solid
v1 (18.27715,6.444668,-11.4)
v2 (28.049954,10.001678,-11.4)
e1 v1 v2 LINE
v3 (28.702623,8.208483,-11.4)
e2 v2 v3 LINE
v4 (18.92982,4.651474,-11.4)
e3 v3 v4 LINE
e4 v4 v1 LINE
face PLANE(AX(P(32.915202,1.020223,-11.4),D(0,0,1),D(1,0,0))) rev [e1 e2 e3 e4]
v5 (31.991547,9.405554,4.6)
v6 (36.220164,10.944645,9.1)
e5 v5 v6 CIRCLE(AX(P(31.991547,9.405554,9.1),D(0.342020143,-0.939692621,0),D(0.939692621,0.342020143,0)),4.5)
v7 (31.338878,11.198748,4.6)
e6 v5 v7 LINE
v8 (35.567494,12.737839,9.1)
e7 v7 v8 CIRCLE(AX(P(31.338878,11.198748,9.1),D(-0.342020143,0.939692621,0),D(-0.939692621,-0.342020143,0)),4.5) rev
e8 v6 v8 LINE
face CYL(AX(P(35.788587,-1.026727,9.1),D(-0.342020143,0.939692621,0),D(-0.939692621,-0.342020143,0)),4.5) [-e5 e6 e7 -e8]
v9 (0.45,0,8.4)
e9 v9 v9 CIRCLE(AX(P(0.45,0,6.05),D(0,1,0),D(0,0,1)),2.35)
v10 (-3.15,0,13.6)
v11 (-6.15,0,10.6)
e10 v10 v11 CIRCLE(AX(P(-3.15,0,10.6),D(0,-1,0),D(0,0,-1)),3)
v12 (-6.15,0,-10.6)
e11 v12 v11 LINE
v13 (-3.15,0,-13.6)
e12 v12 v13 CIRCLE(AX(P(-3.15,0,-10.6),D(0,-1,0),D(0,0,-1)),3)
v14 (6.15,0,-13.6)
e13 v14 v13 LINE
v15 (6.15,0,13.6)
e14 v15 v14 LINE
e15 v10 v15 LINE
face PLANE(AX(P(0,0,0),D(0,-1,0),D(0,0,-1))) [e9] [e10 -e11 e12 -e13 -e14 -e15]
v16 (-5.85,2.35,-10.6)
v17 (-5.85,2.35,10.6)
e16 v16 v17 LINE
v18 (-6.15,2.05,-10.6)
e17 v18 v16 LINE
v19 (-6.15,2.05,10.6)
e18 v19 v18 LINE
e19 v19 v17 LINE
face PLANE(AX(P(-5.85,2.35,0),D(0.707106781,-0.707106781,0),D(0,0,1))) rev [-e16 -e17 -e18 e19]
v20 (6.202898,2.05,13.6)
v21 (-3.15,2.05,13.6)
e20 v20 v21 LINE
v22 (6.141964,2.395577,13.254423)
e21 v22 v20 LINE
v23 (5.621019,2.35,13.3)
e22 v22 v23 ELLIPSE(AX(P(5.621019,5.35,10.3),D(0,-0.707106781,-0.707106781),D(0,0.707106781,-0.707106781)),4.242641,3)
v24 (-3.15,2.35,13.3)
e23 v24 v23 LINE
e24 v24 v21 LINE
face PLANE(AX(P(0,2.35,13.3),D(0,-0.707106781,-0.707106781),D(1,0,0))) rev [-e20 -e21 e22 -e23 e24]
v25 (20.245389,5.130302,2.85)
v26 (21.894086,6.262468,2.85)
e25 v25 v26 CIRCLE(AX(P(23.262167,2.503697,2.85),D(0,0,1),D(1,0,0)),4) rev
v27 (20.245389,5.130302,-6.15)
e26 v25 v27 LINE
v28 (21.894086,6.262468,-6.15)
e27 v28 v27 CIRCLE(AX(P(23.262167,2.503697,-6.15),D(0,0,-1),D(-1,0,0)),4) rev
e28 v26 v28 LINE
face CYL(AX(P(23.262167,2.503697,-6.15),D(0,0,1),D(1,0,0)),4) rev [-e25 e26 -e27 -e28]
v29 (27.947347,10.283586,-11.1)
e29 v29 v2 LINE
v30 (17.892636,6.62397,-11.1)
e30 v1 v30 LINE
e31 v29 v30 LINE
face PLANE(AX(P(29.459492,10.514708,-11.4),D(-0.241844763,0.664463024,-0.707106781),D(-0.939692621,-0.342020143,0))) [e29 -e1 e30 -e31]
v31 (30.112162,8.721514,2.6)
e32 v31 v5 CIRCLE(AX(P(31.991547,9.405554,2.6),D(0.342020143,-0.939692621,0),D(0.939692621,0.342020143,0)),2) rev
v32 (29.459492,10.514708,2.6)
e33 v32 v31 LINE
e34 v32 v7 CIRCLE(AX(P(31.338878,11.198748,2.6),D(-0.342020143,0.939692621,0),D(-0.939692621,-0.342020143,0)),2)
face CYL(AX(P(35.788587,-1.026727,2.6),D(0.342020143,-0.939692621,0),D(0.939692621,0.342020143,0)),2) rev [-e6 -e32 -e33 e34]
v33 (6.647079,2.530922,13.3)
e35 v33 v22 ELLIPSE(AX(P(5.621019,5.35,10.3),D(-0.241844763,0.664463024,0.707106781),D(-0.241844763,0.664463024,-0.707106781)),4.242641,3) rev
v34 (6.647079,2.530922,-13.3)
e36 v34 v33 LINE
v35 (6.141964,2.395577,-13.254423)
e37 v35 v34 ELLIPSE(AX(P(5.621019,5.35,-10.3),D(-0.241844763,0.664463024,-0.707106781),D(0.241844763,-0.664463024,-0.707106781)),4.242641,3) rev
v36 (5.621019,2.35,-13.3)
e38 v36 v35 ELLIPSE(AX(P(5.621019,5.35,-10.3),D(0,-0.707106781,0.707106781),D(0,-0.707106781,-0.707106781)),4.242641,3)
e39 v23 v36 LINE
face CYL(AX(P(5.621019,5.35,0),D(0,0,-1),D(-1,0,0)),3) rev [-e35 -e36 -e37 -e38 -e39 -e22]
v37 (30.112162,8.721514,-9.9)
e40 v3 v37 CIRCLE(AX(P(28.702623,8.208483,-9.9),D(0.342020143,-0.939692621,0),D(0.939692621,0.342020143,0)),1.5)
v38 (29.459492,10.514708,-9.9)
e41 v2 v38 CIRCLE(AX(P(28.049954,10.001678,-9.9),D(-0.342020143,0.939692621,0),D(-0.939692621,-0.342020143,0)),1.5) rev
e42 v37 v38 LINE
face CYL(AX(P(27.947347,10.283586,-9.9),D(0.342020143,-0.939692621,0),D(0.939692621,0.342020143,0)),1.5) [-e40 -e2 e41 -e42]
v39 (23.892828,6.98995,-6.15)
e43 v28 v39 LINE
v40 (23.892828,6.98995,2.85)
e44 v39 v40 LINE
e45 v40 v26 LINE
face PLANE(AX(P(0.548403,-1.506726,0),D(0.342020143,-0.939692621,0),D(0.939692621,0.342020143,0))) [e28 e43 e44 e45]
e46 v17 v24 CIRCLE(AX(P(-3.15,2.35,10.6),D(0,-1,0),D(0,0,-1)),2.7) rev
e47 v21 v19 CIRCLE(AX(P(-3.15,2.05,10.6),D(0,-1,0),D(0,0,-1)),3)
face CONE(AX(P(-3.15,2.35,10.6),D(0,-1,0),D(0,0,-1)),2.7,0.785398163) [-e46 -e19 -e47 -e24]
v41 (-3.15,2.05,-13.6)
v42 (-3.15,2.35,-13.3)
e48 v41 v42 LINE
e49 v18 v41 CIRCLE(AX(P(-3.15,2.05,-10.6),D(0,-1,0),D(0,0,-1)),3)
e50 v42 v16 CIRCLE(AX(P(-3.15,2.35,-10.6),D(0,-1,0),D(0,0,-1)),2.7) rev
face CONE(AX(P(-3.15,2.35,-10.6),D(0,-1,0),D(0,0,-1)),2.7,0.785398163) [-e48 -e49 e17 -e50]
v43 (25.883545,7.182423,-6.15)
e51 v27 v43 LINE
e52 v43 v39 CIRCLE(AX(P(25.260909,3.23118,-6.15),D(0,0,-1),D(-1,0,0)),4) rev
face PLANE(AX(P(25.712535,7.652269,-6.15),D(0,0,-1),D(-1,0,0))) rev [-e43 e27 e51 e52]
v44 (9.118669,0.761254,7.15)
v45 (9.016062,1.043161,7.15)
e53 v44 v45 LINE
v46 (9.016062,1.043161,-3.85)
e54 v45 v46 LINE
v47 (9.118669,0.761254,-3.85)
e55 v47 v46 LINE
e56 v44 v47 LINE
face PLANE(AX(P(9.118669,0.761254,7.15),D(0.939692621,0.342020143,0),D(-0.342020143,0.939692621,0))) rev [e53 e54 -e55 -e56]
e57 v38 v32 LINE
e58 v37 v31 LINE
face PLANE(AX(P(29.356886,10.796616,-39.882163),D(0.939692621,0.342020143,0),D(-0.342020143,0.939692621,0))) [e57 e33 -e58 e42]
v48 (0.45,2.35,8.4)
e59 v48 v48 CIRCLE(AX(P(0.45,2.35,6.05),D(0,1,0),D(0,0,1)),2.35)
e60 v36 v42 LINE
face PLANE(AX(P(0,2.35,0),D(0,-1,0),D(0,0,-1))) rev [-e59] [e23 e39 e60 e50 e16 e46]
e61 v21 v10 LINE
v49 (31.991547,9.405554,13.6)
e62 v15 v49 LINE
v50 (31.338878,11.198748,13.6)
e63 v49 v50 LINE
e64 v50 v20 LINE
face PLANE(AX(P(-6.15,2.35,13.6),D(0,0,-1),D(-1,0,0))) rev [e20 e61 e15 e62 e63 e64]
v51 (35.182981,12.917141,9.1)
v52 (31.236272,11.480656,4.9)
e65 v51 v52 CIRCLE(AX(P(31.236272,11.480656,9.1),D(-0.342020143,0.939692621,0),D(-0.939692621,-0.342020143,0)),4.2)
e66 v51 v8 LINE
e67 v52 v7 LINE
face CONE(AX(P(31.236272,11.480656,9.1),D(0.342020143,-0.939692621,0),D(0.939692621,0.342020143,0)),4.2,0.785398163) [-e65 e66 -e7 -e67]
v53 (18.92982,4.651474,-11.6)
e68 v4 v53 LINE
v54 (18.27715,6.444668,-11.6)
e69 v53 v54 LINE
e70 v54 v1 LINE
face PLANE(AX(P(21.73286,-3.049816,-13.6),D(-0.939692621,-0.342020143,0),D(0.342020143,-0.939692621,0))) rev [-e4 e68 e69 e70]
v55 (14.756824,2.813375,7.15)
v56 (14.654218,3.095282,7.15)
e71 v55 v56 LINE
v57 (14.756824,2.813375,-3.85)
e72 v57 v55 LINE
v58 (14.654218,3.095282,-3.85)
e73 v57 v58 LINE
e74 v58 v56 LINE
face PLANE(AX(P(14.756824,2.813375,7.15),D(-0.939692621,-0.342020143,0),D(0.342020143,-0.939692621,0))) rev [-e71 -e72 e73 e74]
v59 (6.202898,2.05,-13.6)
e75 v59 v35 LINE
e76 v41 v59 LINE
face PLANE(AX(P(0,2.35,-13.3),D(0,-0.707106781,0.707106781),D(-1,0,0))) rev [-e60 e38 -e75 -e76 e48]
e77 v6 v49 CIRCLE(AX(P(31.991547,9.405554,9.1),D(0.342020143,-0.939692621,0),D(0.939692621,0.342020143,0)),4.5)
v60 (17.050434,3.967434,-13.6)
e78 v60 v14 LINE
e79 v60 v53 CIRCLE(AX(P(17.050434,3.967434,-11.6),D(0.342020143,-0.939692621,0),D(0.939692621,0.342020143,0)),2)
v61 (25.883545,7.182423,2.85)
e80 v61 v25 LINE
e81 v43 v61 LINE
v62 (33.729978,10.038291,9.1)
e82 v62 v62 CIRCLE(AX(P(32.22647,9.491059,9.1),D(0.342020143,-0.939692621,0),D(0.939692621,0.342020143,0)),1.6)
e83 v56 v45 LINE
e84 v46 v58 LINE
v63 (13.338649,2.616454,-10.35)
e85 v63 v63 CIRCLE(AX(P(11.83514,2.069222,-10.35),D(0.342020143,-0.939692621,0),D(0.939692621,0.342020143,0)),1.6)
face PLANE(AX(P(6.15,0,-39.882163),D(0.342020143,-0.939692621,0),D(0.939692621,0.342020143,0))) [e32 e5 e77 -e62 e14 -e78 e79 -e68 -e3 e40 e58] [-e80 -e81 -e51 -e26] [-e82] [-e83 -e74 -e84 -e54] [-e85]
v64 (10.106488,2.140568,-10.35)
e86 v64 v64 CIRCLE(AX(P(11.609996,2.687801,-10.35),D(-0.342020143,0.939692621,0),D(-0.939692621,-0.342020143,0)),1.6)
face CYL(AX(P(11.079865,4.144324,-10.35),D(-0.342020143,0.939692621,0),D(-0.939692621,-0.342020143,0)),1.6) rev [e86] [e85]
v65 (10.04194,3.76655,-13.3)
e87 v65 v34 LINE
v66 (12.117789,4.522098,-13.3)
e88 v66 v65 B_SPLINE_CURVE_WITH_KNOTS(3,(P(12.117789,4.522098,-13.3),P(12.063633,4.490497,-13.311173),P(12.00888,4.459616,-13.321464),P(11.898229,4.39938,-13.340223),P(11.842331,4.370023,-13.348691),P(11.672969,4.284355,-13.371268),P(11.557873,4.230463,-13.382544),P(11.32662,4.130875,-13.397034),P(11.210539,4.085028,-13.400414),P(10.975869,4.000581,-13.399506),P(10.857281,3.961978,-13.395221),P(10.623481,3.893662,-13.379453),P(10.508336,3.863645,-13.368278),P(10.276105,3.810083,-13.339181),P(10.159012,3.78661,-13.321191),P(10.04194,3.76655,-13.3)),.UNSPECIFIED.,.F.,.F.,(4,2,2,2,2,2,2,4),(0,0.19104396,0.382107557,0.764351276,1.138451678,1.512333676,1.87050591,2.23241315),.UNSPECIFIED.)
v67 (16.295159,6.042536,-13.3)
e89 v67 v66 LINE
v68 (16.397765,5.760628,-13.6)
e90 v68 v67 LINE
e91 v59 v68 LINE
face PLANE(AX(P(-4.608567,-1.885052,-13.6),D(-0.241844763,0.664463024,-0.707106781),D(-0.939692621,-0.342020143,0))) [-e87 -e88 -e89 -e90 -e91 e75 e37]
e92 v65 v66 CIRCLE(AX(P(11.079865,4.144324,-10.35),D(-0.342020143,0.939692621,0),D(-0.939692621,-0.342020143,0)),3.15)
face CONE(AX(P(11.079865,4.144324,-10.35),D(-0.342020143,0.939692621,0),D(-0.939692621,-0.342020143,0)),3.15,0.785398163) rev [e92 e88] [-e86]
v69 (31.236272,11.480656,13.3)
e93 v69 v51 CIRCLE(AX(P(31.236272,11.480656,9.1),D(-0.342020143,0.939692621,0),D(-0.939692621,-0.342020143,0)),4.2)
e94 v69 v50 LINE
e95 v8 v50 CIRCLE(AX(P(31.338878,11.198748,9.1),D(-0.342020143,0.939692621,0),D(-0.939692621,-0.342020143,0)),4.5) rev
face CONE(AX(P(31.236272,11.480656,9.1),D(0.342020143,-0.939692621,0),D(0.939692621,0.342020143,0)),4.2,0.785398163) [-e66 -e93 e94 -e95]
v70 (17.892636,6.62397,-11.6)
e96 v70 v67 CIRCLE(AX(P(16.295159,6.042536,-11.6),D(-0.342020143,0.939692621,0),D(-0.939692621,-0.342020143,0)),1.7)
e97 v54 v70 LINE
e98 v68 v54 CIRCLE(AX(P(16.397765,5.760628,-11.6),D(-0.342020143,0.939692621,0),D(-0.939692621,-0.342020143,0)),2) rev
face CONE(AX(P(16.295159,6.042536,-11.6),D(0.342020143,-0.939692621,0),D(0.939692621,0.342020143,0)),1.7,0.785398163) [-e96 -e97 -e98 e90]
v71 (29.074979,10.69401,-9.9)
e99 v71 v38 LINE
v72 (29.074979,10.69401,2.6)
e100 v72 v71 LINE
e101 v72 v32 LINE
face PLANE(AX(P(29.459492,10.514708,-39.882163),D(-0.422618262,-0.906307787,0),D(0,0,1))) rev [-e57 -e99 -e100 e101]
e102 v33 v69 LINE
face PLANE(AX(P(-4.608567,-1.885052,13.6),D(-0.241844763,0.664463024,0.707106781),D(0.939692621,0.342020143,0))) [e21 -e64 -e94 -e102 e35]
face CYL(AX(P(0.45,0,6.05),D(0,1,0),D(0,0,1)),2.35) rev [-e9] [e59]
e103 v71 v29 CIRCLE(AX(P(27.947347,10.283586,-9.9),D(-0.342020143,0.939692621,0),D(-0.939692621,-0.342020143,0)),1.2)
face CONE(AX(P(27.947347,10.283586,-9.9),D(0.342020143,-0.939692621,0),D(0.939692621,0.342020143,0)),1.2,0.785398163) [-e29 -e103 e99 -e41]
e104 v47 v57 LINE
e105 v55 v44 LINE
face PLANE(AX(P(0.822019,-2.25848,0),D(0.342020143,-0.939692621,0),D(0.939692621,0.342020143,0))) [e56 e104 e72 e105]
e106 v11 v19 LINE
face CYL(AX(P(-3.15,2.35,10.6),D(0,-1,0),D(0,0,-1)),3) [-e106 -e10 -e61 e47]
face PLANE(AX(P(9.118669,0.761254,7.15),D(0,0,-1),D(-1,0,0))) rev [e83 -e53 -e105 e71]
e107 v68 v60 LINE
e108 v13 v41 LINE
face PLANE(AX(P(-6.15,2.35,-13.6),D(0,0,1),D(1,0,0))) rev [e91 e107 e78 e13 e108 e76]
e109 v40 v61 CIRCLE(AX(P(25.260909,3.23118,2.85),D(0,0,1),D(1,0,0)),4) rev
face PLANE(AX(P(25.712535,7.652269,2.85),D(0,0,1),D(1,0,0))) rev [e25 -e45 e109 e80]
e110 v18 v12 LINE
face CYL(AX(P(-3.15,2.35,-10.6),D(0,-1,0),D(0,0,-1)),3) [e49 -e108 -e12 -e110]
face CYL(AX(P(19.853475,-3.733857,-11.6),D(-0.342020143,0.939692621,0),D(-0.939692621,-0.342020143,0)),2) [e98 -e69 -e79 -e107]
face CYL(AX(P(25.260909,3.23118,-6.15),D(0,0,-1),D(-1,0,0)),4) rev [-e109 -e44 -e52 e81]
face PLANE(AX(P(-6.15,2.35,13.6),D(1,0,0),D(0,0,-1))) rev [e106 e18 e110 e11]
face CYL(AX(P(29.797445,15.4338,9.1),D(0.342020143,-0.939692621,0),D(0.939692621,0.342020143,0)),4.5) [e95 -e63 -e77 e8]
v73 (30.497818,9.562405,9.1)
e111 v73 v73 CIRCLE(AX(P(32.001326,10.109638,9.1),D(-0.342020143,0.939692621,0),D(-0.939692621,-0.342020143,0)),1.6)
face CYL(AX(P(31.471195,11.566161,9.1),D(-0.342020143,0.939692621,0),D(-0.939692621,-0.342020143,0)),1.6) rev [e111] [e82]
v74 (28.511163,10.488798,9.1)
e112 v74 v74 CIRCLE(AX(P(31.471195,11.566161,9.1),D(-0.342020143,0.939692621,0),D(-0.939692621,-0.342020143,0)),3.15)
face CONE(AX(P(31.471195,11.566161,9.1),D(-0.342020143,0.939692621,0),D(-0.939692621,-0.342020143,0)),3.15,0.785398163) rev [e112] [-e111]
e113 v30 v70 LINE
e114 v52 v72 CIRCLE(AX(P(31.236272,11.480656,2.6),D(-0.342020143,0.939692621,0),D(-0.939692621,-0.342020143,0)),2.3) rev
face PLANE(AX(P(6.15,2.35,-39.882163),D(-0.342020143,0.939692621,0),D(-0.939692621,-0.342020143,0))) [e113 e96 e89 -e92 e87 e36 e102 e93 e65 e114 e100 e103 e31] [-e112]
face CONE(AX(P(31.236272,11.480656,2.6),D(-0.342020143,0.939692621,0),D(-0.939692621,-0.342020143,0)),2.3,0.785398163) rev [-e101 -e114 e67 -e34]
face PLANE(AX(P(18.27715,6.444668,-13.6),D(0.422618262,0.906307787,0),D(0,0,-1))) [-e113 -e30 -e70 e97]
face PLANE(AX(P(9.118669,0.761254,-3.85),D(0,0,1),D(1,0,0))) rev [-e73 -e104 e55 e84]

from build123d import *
from OCP.BRepFilletAPI import BRepFilletAPI_MakeFillet

# Parameters (mm, degrees)
SKETCH1_W                                       = 12.3
SKETCH1_H                                       = 27.2
BOSS_EXTRUDE1_DEPTH                             = 2.35
BOSS_EXTRUDE2_DEPTH                             = 27.2
SKETCH3_W                                       = 11.9
SKETCH3_H                                       = 2.2
CUT_EXTRUDE1_DEPTH                              = 35.76078799
FILLET1_R1                                      = 2
FILLET1_R2                                      = 1.5
FILLET1_R3                                      = 3
SKETCH4_R                                       = 2.35
CUT_EXTRUDE2_DEPTH                              = 35.103483837
SKETCH6_W                                       = 6.5
SKETCH6_H                                       = 9
BOSS_EXTRUDE4_DEPTH                             = 2.208277659
FILLET3_R                                       = 2
FILLET4_R                                       = 4.5
CSK_FOR_M3_FLAT_HEAD_MACHINE_SCREW1_D           = 3.2
CSK_FOR_M3_FLAT_HEAD_MACHINE_SCREW1_CSINK_D     = 6.3
CSK_FOR_M3_FLAT_HEAD_MACHINE_SCREW1_CSINK_ANGLE = 90
FILLET6_R                                       = 3
CHAMFER2_SIZE                                   = 0.3
FILLET7_R                                       = 3
SKETCH14_W                                      = 6
SKETCH14_H                                      = 11
BOSS_EXTRUDE5_DEPTH                             = 0.3
SKETCH15_W                                      = 6
SKETCH15_H                                      = 9
CUT_EXTRUDE3_DEPTH                              = 0.5
FILLET8_R                                       = 4


# Some blends are built 0.0001 mm under size
with BuildPart() as part:
    # Sketch1 → Boss-Extrude1 (new body)
    with BuildSketch(Plane(origin=(0, 0, 0), x_dir=(1, 0, 0), z_dir=(0, 1, 0))):
        Rectangle(SKETCH1_W, SKETCH1_H)
    extrude(amount=BOSS_EXTRUDE1_DEPTH)

    # Sketch2 → Boss-Extrude2 (add)
    with BuildSketch(Plane.XY.offset(13.6)):
        Polygon((6.15, 2.35), (29.356886389, 10.796615875), (30.11216183, 8.721513655), (6.15, 0), align=None)
    extrude(amount=-BOSS_EXTRUDE2_DEPTH)

    # Sketch3 → Cut-Extrude1 (cut, through all)
    with BuildSketch(Plane(origin=(-0.035862104, 0.098530321, 0), x_dir=(0.9396926207859082, 0.34202014332566943, 0), z_dir=(-0.34202014332566943, 0.9396926207859082, 0))):
        with Locations((25.329109618, 12.5)):
            Rectangle(SKETCH3_W, SKETCH3_H)
    extrude(amount=-CUT_EXTRUDE1_DEPTH, mode=Mode.SUBTRACT)

    # Fillet1: one fillet with a radius per group of edges: ONE call of the kernel's fillet builder (fillet() takes one radius for all edges)
    fillet1_edges_1 = [part.edges().sort_by_distance(p)[0] for p in [
        (18.552181922, 5.68902506, -13.6),
    ]]
    fillet1_edges_2 = [part.edges().sort_by_distance(p)[0] for p in [
        (29.734524109, 9.759064765, -11.4),
    ]]
    fillet1_edges_3 = [part.edges().sort_by_distance(p)[0] for p in [
        (-6.15, 1.175, -13.6),
    ]]
    fillet1 = BRepFilletAPI_MakeFillet(part.part.solid().wrapped)
    for e in fillet1_edges_1:
        fillet1.Add(FILLET1_R1, e.wrapped)
    for e in fillet1_edges_2:
        fillet1.Add(FILLET1_R2, e.wrapped)
    for e in fillet1_edges_3:
        fillet1.Add(FILLET1_R3, e.wrapped)
    add(Compound.cast(fillet1.Shape()), mode=Mode.REPLACE)

    # Sketch4 → Cut-Extrude2 (cut, through all)
    with BuildSketch(Plane(origin=(0, 2.35, 0), x_dir=(1, 0, 0), z_dir=(0, 1, 0))):
        with Locations(Location((0.45, -6.05, 0), (0, 0, 270))):
            Circle(SKETCH4_R)
    extrude(amount=-CUT_EXTRUDE2_DEPTH, mode=Mode.SUBTRACT)

    # Sketch6 → Boss-Extrude4 (add)
    with BuildSketch(Plane(origin=(-0.035862104, 0.098530321, 0), x_dir=(0.9396926207859082, 0.34202014332566943, 0), z_dir=(-0.34202014332566943, 0.9396926207859082, 0))):
        with Locations((34.529109618, -9.1)):
            Rectangle(SKETCH6_W, SKETCH6_H)
    extrude(amount=-BOSS_EXTRUDE4_DEPTH)

    # Fillet3
    fillet3_edges = [part.edges().sort_by_distance(p)[0] for p in [
        (29.734524109, 9.759064765, 4.6),
    ]]
    fillet(fillet3_edges, radius=FILLET3_R)

    # Fillet4
    fillet4_edges = [part.edges().sort_by_distance(p)[0] for p in [
        (35.842526144, 11.982195697, 13.6),
        (35.842526144, 11.982195697, 4.6),
    ]]
    fillet(fillet4_edges, radius=FILLET4_R - 0.0001)  # a hair under: the kernel refuses the full size

    # CSK for M3 Flat Head Machine Screw1 (through all)
    with Locations(Plane(origin=(-0.035862104, 0.098530321, 0), x_dir=(0.9396926207859082, 0.34202014332566943, 0), z_dir=(-0.34202014332566943, 0.9396926207859082, 0))):
        with Locations((33.529109618, -9.1), (11.829109618, 10.35)):
            CounterSinkHole(CSK_FOR_M3_FLAT_HEAD_MACHINE_SCREW1_D / 2, CSK_FOR_M3_FLAT_HEAD_MACHINE_SCREW1_CSINK_D / 2, counter_sink_angle=CSK_FOR_M3_FLAT_HEAD_MACHINE_SCREW1_CSINK_ANGLE)

    # Fillet6
    fillet6_edges = [part.edges().sort_by_distance(p)[0] for p in [
        (-6.15, 1.175, 13.6),
    ]]
    fillet(fillet6_edges, radius=FILLET6_R)

    # Chamfer2
    # the kernel refuses this chamfer: 0.3 mm, written as the material it takes off along each edge
    with BuildSketch(Plane(origin=(-3.15, 2.35, 13.6), x_dir=(0, -1, 0), z_dir=(1, 0, 0))) as chamfer2_piece_1_section:
        Polygon((CHAMFER2_SIZE, 0), (0, CHAMFER2_SIZE), (0, 0), align=None)
    chamfer2_piece_1 = extrude(amount=10.071504896, mode=Mode.PRIVATE)
    chamfer2_piece_1 = split(chamfer2_piece_1, bisect_by=Plane(origin=(-2.554750309, 0.714564914, 11.859606334), z_dir=(-0.2418447626479751, 0.6644630243886727, 0.7071067811865496)), keep=Keep.TOP, mode=Mode.PRIVATE)
    add(chamfer2_piece_1, mode=Mode.SUBTRACT)
    with BuildSketch(Plane(origin=(-3.15, 2.35, 10.6), x_dir=(-1, 0, 0), z_dir=(0, 0, -1))) as chamfer2_piece_2:
        Polygon((3, -CHAMFER2_SIZE), (3 - CHAMFER2_SIZE, 0), (3, 0), align=None)
    revolve(axis=Axis((-3.15, 2.35, 10.6), (0, 1, 0)), revolution_arc=90, mode=Mode.SUBTRACT)
    with BuildSketch(Plane(origin=(5.425022542, 2.086129785, -13.6), x_dir=(0.34202014332566943, -0.9396926207859082, 0), z_dir=(0.9396926207859081, 0.34202014332566943, 0))) as chamfer2_piece_3_section:
        Polygon((CHAMFER2_SIZE, 0), (0, -CHAMFER2_SIZE), (0, 0), align=None)
    chamfer2_piece_3 = extrude(amount=11.56775756, mode=Mode.PRIVATE)
    chamfer2_piece_3 = split(chamfer2_piece_3, bisect_by=Plane(origin=(5.425022542, 2.068064892, -13.581935108), z_dir=(0, 0.7071067811865486, -0.7071067811865465)), keep=Keep.TOP, mode=Mode.PRIVATE)
    add(chamfer2_piece_3, mode=Mode.SUBTRACT)
    with BuildSketch(Plane(origin=(17.449566743, 6.462705955, -11.4), x_dir=(0, 0, 1), z_dir=(0.9396926207859082, 0.34202014332566943, 0))) as chamfer2_piece_4_section:
        Polygon((CHAMFER2_SIZE, 0), (0, CHAMFER2_SIZE), (0, 0), align=None)
    chamfer2_piece_4 = extrude(amount=11.171504896, mode=Mode.PRIVATE)
    chamfer2_piece_4 = split(chamfer2_piece_4, bisect_by=Plane(origin=(17.590469493, 6.764872877, -11.4), z_dir=(0.42261826174069733, 0.9063077870366509, 0)), keep=Keep.TOP, mode=Mode.PRIVATE)
    add(chamfer2_piece_4, mode=Mode.SUBTRACT)
    with BuildSketch(Plane(origin=(-6.15, 2.35, -10.6), x_dir=(0, -1, 0), z_dir=(0, 0, 1))) as chamfer2_piece_5:
        Polygon((CHAMFER2_SIZE, 0), (0, CHAMFER2_SIZE), (0, 0), align=None)
    extrude(amount=21.2, mode=Mode.SUBTRACT)
    with BuildSketch(Plane(origin=(-3.15, 2.35, -10.6), x_dir=(-1, 0, 0), z_dir=(0, 0, 1))) as chamfer2_piece_6:
        Polygon((3, CHAMFER2_SIZE), (3 - CHAMFER2_SIZE, 0), (3, 0), align=None)
    revolve(axis=Axis((-3.15, 2.35, -10.6), (0, -1, 0)), revolution_arc=90, mode=Mode.SUBTRACT)
    with BuildSketch(Plane(origin=(29.356886389, 10.796615875, 2.6), x_dir=(-0.9396926207859078, -0.34202014332567043, 0), z_dir=(0, 0, -1))) as chamfer2_piece_7:
        Polygon((CHAMFER2_SIZE, 0), (0, -CHAMFER2_SIZE), (0, 0), align=None)
    extrude(amount=12.5, mode=Mode.SUBTRACT)
    with BuildSketch(Plane(origin=(18.174544201, 6.72657617, -11.6), x_dir=(-0.9396926207859083, -0.342020143325669, 0), z_dir=(0, 0, 1))) as chamfer2_piece_8_section:
        Polygon((CHAMFER2_SIZE, 0), (0, CHAMFER2_SIZE), (0, 0), align=None)
    chamfer2_piece_8 = extrude(amount=0.971504896, mode=Mode.PRIVATE)
    chamfer2_piece_8 = split(chamfer2_piece_8, bisect_by=Plane(origin=(18.260049237, 6.491653015, -11.35), z_dir=(-0.24184476264797733, 0.6644630243886783, -0.7071067811865436)), keep=Keep.TOP, mode=Mode.PRIVATE)
    add(chamfer2_piece_8, mode=Mode.SUBTRACT)
    with BuildSketch(Plane(origin=(16.29515896, 6.042535883, -11.6), x_dir=(0, 0, -1), z_dir=(-0.9396926207859082, -0.34202014332566943, 0))) as chamfer2_piece_9:
        Polygon((2 - CHAMFER2_SIZE, 0), (2, CHAMFER2_SIZE), (2, 0), align=None)
    revolve(axis=Axis((16.29515896, 6.042535883, -11.6), (0.34202014332566943, -0.9396926207859082, 0)), revolution_arc=90, mode=Mode.SUBTRACT)
    with BuildSketch(Plane(origin=(27.947347457, 10.28358566, -9.9), x_dir=(0.9396926207859081, 0.3420201433256695, 0), z_dir=(0, 0, 1))) as chamfer2_piece_10:
        Polygon((1.5 - CHAMFER2_SIZE, 0), (1.5, -CHAMFER2_SIZE), (1.5, 0), align=None)
    revolve(axis=Axis((27.947347457, 10.28358566, -9.9), (-0.34202014332566943, 0.9396926207859082, 0)), revolution_arc=90, mode=Mode.SUBTRACT)
    with BuildSketch(Plane(origin=(6.921504896, 2.35, -13.6), x_dir=(0, -1, 0), z_dir=(-1, 0, 0))) as chamfer2_piece_11_section:
        Polygon((CHAMFER2_SIZE, 0), (0, CHAMFER2_SIZE), (0, 0), align=None)
    chamfer2_piece_11 = extrude(amount=10.071504896, mode=Mode.PRIVATE)
    chamfer2_piece_11 = split(chamfer2_piece_11, bisect_by=Plane(origin=(6.927683453, 2.333024554, -13.581935108), z_dir=(-0.24184476264797608, 0.6644630243886753, -0.7071067811865468)), keep=Keep.TOP, mode=Mode.PRIVATE)
    add(chamfer2_piece_11, mode=Mode.SUBTRACT)
    with BuildSketch(Plane(origin=(31.23627163, 11.480656162, 2.6), x_dir=(0, 0, 1), z_dir=(0.9396926207859082, 0.3420201433256694, 0))) as chamfer2_piece_12:
        Polygon((2 + CHAMFER2_SIZE, 0), (2, CHAMFER2_SIZE), (2, 0), align=None)
    revolve(axis=Axis((31.23627163, 11.480656162, 2.6), (0.3420201433256694, -0.9396926207859082, 0)), revolution_arc=90, mode=Mode.SUBTRACT)
    with BuildSketch(Plane(origin=(31.236365599, 11.480690364, 13.6), x_dir=(0.34202014332566943, -0.9396926207859082, 0), z_dir=(-0.9396926207859082, -0.34202014332566943, 0))) as chamfer2_piece_13_section:
        Polygon((CHAMFER2_SIZE, 0), (0, -CHAMFER2_SIZE), (0, 0), align=None)
    chamfer2_piece_13 = extrude(amount=27.46785756, mode=Mode.PRIVATE)
    chamfer2_piece_13 = split(chamfer2_piece_13, bisect_by=Plane(origin=(31.236365599, 6.765345182, 8.884654818), z_dir=(0, 0.7071067811865486, 0.7071067811865465)), keep=Keep.TOP, mode=Mode.PRIVATE)
    add(chamfer2_piece_13, mode=Mode.SUBTRACT)
    with BuildSketch(Plane(origin=(31.236365599, 11.480690364, 9.0999), x_dir=(0, 0, -1), z_dir=(-0.9396926207859082, -0.3420201433256694, 0))) as chamfer2_piece_14:
        Polygon((4.4999 - CHAMFER2_SIZE, 0), (4.4999, CHAMFER2_SIZE), (4.4999, 0), align=None)
    revolve(axis=Axis((31.236365599, 11.480690364, 9.0999), (0.3420201433256694, -0.9396926207859082, 0)), revolution_arc=90, mode=Mode.SUBTRACT)
    with BuildSketch(Plane(origin=(31.236365599, 11.480690364, 9.1001), x_dir=(0.9396926207859081, 0.3420201433256696, 0), z_dir=(0, 0, -1))) as chamfer2_piece_15:
        Polygon((4.4999 - CHAMFER2_SIZE, 0), (4.4999, CHAMFER2_SIZE), (4.4999, 0), align=None)
    revolve(axis=Axis((31.236365599, 11.480690364, 9.1001), (0.3420201433256694, -0.9396926207859082, 0)), revolution_arc=90, mode=Mode.SUBTRACT)
    with BuildSketch(Plane(origin=(35.464888424, 13.019746807, 9.1001), x_dir=(-0.9396926207859088, -0.34202014332566755, 0), z_dir=(0, 0, -1))) as chamfer2_piece_16:
        Polygon((CHAMFER2_SIZE, 0), (0, -CHAMFER2_SIZE), (0, 0), align=None)
    extrude(amount=0.0002, mode=Mode.SUBTRACT)
    with BuildSketch(Plane(origin=(31.236365599, 11.480690364, 4.6), x_dir=(0, 0, 1), z_dir=(-0.9396926207859082, -0.34202014332566943, 0))) as chamfer2_piece_17:
        Polygon((CHAMFER2_SIZE, 0), (0, -CHAMFER2_SIZE), (0, 0), align=None)
    extrude(amount=0.0001, mode=Mode.SUBTRACT)

    # Fillet7
    fillet7_edges = [part.edges().sort_by_distance(p)[0] for p in [
        (6.15, 2.35, 0),
    ]]
    fillet(fillet7_edges, radius=FILLET7_R)

    # Sketch14 → Boss-Extrude5 (add)
    with BuildSketch(Plane(origin=(0.719413337, -1.9765719, 0), x_dir=(0.9396926207859082, 0.34202014332566943, 0), z_dir=(0.34202014332566943, -0.9396926207859082, 0))):
        with Locations((11.829109618, 1.65)):
            Rectangle(SKETCH14_W, SKETCH14_H)
    extrude(amount=BOSS_EXTRUDE5_DEPTH)

    # Sketch15 → Cut-Extrude3 (cut)
    with BuildSketch(Plane(origin=(0.719413337, -1.9765719, 0), x_dir=(0.9396926207859082, 0.34202014332566943, 0), z_dir=(0.34202014332566943, -0.9396926207859082, 0))):
        with Locations((23.779109618, -1.65)):
            Rectangle(SKETCH15_W, SKETCH15_H)
    extrude(amount=-CUT_EXTRUDE3_DEPTH, mode=Mode.SUBTRACT)

    # Fillet8
    # the kernel refuses this fillet: 4 mm, written as the material it adds along each edge
    with BuildSketch(Plane(origin=(25.712534965, 7.65226932, 7.691229183), x_dir=(0.3420201433256748, -0.9396926207859063, 0), z_dir=(0, 0, -1)), Plane(origin=(20.07437924, 5.60014846, -10.991229183), x_dir=(0.3420201433256691, -0.9396926207859082, 0), z_dir=(0, 0, 1))) as fillet8_piece_1:
        with BuildLine():
            CenterArc((4, 1.936491673), FILLET8_R, 180, 28.955024372)
            Line((0, 1.936491673), (-0.08, 1.936491673))
            Line((-0.08, 1.936491673), (-0.08, 0))
            Line((-0.08, 0), (0, -0.08))
            ThreePointArc((0, -0.08), (0.25, -0.08), (0.43, -0.038729833))
            Line((0.43, -0.038729833), (0.5, 0))
        make_face()
    extrude(amount=18.682458366)


solid = part.part
